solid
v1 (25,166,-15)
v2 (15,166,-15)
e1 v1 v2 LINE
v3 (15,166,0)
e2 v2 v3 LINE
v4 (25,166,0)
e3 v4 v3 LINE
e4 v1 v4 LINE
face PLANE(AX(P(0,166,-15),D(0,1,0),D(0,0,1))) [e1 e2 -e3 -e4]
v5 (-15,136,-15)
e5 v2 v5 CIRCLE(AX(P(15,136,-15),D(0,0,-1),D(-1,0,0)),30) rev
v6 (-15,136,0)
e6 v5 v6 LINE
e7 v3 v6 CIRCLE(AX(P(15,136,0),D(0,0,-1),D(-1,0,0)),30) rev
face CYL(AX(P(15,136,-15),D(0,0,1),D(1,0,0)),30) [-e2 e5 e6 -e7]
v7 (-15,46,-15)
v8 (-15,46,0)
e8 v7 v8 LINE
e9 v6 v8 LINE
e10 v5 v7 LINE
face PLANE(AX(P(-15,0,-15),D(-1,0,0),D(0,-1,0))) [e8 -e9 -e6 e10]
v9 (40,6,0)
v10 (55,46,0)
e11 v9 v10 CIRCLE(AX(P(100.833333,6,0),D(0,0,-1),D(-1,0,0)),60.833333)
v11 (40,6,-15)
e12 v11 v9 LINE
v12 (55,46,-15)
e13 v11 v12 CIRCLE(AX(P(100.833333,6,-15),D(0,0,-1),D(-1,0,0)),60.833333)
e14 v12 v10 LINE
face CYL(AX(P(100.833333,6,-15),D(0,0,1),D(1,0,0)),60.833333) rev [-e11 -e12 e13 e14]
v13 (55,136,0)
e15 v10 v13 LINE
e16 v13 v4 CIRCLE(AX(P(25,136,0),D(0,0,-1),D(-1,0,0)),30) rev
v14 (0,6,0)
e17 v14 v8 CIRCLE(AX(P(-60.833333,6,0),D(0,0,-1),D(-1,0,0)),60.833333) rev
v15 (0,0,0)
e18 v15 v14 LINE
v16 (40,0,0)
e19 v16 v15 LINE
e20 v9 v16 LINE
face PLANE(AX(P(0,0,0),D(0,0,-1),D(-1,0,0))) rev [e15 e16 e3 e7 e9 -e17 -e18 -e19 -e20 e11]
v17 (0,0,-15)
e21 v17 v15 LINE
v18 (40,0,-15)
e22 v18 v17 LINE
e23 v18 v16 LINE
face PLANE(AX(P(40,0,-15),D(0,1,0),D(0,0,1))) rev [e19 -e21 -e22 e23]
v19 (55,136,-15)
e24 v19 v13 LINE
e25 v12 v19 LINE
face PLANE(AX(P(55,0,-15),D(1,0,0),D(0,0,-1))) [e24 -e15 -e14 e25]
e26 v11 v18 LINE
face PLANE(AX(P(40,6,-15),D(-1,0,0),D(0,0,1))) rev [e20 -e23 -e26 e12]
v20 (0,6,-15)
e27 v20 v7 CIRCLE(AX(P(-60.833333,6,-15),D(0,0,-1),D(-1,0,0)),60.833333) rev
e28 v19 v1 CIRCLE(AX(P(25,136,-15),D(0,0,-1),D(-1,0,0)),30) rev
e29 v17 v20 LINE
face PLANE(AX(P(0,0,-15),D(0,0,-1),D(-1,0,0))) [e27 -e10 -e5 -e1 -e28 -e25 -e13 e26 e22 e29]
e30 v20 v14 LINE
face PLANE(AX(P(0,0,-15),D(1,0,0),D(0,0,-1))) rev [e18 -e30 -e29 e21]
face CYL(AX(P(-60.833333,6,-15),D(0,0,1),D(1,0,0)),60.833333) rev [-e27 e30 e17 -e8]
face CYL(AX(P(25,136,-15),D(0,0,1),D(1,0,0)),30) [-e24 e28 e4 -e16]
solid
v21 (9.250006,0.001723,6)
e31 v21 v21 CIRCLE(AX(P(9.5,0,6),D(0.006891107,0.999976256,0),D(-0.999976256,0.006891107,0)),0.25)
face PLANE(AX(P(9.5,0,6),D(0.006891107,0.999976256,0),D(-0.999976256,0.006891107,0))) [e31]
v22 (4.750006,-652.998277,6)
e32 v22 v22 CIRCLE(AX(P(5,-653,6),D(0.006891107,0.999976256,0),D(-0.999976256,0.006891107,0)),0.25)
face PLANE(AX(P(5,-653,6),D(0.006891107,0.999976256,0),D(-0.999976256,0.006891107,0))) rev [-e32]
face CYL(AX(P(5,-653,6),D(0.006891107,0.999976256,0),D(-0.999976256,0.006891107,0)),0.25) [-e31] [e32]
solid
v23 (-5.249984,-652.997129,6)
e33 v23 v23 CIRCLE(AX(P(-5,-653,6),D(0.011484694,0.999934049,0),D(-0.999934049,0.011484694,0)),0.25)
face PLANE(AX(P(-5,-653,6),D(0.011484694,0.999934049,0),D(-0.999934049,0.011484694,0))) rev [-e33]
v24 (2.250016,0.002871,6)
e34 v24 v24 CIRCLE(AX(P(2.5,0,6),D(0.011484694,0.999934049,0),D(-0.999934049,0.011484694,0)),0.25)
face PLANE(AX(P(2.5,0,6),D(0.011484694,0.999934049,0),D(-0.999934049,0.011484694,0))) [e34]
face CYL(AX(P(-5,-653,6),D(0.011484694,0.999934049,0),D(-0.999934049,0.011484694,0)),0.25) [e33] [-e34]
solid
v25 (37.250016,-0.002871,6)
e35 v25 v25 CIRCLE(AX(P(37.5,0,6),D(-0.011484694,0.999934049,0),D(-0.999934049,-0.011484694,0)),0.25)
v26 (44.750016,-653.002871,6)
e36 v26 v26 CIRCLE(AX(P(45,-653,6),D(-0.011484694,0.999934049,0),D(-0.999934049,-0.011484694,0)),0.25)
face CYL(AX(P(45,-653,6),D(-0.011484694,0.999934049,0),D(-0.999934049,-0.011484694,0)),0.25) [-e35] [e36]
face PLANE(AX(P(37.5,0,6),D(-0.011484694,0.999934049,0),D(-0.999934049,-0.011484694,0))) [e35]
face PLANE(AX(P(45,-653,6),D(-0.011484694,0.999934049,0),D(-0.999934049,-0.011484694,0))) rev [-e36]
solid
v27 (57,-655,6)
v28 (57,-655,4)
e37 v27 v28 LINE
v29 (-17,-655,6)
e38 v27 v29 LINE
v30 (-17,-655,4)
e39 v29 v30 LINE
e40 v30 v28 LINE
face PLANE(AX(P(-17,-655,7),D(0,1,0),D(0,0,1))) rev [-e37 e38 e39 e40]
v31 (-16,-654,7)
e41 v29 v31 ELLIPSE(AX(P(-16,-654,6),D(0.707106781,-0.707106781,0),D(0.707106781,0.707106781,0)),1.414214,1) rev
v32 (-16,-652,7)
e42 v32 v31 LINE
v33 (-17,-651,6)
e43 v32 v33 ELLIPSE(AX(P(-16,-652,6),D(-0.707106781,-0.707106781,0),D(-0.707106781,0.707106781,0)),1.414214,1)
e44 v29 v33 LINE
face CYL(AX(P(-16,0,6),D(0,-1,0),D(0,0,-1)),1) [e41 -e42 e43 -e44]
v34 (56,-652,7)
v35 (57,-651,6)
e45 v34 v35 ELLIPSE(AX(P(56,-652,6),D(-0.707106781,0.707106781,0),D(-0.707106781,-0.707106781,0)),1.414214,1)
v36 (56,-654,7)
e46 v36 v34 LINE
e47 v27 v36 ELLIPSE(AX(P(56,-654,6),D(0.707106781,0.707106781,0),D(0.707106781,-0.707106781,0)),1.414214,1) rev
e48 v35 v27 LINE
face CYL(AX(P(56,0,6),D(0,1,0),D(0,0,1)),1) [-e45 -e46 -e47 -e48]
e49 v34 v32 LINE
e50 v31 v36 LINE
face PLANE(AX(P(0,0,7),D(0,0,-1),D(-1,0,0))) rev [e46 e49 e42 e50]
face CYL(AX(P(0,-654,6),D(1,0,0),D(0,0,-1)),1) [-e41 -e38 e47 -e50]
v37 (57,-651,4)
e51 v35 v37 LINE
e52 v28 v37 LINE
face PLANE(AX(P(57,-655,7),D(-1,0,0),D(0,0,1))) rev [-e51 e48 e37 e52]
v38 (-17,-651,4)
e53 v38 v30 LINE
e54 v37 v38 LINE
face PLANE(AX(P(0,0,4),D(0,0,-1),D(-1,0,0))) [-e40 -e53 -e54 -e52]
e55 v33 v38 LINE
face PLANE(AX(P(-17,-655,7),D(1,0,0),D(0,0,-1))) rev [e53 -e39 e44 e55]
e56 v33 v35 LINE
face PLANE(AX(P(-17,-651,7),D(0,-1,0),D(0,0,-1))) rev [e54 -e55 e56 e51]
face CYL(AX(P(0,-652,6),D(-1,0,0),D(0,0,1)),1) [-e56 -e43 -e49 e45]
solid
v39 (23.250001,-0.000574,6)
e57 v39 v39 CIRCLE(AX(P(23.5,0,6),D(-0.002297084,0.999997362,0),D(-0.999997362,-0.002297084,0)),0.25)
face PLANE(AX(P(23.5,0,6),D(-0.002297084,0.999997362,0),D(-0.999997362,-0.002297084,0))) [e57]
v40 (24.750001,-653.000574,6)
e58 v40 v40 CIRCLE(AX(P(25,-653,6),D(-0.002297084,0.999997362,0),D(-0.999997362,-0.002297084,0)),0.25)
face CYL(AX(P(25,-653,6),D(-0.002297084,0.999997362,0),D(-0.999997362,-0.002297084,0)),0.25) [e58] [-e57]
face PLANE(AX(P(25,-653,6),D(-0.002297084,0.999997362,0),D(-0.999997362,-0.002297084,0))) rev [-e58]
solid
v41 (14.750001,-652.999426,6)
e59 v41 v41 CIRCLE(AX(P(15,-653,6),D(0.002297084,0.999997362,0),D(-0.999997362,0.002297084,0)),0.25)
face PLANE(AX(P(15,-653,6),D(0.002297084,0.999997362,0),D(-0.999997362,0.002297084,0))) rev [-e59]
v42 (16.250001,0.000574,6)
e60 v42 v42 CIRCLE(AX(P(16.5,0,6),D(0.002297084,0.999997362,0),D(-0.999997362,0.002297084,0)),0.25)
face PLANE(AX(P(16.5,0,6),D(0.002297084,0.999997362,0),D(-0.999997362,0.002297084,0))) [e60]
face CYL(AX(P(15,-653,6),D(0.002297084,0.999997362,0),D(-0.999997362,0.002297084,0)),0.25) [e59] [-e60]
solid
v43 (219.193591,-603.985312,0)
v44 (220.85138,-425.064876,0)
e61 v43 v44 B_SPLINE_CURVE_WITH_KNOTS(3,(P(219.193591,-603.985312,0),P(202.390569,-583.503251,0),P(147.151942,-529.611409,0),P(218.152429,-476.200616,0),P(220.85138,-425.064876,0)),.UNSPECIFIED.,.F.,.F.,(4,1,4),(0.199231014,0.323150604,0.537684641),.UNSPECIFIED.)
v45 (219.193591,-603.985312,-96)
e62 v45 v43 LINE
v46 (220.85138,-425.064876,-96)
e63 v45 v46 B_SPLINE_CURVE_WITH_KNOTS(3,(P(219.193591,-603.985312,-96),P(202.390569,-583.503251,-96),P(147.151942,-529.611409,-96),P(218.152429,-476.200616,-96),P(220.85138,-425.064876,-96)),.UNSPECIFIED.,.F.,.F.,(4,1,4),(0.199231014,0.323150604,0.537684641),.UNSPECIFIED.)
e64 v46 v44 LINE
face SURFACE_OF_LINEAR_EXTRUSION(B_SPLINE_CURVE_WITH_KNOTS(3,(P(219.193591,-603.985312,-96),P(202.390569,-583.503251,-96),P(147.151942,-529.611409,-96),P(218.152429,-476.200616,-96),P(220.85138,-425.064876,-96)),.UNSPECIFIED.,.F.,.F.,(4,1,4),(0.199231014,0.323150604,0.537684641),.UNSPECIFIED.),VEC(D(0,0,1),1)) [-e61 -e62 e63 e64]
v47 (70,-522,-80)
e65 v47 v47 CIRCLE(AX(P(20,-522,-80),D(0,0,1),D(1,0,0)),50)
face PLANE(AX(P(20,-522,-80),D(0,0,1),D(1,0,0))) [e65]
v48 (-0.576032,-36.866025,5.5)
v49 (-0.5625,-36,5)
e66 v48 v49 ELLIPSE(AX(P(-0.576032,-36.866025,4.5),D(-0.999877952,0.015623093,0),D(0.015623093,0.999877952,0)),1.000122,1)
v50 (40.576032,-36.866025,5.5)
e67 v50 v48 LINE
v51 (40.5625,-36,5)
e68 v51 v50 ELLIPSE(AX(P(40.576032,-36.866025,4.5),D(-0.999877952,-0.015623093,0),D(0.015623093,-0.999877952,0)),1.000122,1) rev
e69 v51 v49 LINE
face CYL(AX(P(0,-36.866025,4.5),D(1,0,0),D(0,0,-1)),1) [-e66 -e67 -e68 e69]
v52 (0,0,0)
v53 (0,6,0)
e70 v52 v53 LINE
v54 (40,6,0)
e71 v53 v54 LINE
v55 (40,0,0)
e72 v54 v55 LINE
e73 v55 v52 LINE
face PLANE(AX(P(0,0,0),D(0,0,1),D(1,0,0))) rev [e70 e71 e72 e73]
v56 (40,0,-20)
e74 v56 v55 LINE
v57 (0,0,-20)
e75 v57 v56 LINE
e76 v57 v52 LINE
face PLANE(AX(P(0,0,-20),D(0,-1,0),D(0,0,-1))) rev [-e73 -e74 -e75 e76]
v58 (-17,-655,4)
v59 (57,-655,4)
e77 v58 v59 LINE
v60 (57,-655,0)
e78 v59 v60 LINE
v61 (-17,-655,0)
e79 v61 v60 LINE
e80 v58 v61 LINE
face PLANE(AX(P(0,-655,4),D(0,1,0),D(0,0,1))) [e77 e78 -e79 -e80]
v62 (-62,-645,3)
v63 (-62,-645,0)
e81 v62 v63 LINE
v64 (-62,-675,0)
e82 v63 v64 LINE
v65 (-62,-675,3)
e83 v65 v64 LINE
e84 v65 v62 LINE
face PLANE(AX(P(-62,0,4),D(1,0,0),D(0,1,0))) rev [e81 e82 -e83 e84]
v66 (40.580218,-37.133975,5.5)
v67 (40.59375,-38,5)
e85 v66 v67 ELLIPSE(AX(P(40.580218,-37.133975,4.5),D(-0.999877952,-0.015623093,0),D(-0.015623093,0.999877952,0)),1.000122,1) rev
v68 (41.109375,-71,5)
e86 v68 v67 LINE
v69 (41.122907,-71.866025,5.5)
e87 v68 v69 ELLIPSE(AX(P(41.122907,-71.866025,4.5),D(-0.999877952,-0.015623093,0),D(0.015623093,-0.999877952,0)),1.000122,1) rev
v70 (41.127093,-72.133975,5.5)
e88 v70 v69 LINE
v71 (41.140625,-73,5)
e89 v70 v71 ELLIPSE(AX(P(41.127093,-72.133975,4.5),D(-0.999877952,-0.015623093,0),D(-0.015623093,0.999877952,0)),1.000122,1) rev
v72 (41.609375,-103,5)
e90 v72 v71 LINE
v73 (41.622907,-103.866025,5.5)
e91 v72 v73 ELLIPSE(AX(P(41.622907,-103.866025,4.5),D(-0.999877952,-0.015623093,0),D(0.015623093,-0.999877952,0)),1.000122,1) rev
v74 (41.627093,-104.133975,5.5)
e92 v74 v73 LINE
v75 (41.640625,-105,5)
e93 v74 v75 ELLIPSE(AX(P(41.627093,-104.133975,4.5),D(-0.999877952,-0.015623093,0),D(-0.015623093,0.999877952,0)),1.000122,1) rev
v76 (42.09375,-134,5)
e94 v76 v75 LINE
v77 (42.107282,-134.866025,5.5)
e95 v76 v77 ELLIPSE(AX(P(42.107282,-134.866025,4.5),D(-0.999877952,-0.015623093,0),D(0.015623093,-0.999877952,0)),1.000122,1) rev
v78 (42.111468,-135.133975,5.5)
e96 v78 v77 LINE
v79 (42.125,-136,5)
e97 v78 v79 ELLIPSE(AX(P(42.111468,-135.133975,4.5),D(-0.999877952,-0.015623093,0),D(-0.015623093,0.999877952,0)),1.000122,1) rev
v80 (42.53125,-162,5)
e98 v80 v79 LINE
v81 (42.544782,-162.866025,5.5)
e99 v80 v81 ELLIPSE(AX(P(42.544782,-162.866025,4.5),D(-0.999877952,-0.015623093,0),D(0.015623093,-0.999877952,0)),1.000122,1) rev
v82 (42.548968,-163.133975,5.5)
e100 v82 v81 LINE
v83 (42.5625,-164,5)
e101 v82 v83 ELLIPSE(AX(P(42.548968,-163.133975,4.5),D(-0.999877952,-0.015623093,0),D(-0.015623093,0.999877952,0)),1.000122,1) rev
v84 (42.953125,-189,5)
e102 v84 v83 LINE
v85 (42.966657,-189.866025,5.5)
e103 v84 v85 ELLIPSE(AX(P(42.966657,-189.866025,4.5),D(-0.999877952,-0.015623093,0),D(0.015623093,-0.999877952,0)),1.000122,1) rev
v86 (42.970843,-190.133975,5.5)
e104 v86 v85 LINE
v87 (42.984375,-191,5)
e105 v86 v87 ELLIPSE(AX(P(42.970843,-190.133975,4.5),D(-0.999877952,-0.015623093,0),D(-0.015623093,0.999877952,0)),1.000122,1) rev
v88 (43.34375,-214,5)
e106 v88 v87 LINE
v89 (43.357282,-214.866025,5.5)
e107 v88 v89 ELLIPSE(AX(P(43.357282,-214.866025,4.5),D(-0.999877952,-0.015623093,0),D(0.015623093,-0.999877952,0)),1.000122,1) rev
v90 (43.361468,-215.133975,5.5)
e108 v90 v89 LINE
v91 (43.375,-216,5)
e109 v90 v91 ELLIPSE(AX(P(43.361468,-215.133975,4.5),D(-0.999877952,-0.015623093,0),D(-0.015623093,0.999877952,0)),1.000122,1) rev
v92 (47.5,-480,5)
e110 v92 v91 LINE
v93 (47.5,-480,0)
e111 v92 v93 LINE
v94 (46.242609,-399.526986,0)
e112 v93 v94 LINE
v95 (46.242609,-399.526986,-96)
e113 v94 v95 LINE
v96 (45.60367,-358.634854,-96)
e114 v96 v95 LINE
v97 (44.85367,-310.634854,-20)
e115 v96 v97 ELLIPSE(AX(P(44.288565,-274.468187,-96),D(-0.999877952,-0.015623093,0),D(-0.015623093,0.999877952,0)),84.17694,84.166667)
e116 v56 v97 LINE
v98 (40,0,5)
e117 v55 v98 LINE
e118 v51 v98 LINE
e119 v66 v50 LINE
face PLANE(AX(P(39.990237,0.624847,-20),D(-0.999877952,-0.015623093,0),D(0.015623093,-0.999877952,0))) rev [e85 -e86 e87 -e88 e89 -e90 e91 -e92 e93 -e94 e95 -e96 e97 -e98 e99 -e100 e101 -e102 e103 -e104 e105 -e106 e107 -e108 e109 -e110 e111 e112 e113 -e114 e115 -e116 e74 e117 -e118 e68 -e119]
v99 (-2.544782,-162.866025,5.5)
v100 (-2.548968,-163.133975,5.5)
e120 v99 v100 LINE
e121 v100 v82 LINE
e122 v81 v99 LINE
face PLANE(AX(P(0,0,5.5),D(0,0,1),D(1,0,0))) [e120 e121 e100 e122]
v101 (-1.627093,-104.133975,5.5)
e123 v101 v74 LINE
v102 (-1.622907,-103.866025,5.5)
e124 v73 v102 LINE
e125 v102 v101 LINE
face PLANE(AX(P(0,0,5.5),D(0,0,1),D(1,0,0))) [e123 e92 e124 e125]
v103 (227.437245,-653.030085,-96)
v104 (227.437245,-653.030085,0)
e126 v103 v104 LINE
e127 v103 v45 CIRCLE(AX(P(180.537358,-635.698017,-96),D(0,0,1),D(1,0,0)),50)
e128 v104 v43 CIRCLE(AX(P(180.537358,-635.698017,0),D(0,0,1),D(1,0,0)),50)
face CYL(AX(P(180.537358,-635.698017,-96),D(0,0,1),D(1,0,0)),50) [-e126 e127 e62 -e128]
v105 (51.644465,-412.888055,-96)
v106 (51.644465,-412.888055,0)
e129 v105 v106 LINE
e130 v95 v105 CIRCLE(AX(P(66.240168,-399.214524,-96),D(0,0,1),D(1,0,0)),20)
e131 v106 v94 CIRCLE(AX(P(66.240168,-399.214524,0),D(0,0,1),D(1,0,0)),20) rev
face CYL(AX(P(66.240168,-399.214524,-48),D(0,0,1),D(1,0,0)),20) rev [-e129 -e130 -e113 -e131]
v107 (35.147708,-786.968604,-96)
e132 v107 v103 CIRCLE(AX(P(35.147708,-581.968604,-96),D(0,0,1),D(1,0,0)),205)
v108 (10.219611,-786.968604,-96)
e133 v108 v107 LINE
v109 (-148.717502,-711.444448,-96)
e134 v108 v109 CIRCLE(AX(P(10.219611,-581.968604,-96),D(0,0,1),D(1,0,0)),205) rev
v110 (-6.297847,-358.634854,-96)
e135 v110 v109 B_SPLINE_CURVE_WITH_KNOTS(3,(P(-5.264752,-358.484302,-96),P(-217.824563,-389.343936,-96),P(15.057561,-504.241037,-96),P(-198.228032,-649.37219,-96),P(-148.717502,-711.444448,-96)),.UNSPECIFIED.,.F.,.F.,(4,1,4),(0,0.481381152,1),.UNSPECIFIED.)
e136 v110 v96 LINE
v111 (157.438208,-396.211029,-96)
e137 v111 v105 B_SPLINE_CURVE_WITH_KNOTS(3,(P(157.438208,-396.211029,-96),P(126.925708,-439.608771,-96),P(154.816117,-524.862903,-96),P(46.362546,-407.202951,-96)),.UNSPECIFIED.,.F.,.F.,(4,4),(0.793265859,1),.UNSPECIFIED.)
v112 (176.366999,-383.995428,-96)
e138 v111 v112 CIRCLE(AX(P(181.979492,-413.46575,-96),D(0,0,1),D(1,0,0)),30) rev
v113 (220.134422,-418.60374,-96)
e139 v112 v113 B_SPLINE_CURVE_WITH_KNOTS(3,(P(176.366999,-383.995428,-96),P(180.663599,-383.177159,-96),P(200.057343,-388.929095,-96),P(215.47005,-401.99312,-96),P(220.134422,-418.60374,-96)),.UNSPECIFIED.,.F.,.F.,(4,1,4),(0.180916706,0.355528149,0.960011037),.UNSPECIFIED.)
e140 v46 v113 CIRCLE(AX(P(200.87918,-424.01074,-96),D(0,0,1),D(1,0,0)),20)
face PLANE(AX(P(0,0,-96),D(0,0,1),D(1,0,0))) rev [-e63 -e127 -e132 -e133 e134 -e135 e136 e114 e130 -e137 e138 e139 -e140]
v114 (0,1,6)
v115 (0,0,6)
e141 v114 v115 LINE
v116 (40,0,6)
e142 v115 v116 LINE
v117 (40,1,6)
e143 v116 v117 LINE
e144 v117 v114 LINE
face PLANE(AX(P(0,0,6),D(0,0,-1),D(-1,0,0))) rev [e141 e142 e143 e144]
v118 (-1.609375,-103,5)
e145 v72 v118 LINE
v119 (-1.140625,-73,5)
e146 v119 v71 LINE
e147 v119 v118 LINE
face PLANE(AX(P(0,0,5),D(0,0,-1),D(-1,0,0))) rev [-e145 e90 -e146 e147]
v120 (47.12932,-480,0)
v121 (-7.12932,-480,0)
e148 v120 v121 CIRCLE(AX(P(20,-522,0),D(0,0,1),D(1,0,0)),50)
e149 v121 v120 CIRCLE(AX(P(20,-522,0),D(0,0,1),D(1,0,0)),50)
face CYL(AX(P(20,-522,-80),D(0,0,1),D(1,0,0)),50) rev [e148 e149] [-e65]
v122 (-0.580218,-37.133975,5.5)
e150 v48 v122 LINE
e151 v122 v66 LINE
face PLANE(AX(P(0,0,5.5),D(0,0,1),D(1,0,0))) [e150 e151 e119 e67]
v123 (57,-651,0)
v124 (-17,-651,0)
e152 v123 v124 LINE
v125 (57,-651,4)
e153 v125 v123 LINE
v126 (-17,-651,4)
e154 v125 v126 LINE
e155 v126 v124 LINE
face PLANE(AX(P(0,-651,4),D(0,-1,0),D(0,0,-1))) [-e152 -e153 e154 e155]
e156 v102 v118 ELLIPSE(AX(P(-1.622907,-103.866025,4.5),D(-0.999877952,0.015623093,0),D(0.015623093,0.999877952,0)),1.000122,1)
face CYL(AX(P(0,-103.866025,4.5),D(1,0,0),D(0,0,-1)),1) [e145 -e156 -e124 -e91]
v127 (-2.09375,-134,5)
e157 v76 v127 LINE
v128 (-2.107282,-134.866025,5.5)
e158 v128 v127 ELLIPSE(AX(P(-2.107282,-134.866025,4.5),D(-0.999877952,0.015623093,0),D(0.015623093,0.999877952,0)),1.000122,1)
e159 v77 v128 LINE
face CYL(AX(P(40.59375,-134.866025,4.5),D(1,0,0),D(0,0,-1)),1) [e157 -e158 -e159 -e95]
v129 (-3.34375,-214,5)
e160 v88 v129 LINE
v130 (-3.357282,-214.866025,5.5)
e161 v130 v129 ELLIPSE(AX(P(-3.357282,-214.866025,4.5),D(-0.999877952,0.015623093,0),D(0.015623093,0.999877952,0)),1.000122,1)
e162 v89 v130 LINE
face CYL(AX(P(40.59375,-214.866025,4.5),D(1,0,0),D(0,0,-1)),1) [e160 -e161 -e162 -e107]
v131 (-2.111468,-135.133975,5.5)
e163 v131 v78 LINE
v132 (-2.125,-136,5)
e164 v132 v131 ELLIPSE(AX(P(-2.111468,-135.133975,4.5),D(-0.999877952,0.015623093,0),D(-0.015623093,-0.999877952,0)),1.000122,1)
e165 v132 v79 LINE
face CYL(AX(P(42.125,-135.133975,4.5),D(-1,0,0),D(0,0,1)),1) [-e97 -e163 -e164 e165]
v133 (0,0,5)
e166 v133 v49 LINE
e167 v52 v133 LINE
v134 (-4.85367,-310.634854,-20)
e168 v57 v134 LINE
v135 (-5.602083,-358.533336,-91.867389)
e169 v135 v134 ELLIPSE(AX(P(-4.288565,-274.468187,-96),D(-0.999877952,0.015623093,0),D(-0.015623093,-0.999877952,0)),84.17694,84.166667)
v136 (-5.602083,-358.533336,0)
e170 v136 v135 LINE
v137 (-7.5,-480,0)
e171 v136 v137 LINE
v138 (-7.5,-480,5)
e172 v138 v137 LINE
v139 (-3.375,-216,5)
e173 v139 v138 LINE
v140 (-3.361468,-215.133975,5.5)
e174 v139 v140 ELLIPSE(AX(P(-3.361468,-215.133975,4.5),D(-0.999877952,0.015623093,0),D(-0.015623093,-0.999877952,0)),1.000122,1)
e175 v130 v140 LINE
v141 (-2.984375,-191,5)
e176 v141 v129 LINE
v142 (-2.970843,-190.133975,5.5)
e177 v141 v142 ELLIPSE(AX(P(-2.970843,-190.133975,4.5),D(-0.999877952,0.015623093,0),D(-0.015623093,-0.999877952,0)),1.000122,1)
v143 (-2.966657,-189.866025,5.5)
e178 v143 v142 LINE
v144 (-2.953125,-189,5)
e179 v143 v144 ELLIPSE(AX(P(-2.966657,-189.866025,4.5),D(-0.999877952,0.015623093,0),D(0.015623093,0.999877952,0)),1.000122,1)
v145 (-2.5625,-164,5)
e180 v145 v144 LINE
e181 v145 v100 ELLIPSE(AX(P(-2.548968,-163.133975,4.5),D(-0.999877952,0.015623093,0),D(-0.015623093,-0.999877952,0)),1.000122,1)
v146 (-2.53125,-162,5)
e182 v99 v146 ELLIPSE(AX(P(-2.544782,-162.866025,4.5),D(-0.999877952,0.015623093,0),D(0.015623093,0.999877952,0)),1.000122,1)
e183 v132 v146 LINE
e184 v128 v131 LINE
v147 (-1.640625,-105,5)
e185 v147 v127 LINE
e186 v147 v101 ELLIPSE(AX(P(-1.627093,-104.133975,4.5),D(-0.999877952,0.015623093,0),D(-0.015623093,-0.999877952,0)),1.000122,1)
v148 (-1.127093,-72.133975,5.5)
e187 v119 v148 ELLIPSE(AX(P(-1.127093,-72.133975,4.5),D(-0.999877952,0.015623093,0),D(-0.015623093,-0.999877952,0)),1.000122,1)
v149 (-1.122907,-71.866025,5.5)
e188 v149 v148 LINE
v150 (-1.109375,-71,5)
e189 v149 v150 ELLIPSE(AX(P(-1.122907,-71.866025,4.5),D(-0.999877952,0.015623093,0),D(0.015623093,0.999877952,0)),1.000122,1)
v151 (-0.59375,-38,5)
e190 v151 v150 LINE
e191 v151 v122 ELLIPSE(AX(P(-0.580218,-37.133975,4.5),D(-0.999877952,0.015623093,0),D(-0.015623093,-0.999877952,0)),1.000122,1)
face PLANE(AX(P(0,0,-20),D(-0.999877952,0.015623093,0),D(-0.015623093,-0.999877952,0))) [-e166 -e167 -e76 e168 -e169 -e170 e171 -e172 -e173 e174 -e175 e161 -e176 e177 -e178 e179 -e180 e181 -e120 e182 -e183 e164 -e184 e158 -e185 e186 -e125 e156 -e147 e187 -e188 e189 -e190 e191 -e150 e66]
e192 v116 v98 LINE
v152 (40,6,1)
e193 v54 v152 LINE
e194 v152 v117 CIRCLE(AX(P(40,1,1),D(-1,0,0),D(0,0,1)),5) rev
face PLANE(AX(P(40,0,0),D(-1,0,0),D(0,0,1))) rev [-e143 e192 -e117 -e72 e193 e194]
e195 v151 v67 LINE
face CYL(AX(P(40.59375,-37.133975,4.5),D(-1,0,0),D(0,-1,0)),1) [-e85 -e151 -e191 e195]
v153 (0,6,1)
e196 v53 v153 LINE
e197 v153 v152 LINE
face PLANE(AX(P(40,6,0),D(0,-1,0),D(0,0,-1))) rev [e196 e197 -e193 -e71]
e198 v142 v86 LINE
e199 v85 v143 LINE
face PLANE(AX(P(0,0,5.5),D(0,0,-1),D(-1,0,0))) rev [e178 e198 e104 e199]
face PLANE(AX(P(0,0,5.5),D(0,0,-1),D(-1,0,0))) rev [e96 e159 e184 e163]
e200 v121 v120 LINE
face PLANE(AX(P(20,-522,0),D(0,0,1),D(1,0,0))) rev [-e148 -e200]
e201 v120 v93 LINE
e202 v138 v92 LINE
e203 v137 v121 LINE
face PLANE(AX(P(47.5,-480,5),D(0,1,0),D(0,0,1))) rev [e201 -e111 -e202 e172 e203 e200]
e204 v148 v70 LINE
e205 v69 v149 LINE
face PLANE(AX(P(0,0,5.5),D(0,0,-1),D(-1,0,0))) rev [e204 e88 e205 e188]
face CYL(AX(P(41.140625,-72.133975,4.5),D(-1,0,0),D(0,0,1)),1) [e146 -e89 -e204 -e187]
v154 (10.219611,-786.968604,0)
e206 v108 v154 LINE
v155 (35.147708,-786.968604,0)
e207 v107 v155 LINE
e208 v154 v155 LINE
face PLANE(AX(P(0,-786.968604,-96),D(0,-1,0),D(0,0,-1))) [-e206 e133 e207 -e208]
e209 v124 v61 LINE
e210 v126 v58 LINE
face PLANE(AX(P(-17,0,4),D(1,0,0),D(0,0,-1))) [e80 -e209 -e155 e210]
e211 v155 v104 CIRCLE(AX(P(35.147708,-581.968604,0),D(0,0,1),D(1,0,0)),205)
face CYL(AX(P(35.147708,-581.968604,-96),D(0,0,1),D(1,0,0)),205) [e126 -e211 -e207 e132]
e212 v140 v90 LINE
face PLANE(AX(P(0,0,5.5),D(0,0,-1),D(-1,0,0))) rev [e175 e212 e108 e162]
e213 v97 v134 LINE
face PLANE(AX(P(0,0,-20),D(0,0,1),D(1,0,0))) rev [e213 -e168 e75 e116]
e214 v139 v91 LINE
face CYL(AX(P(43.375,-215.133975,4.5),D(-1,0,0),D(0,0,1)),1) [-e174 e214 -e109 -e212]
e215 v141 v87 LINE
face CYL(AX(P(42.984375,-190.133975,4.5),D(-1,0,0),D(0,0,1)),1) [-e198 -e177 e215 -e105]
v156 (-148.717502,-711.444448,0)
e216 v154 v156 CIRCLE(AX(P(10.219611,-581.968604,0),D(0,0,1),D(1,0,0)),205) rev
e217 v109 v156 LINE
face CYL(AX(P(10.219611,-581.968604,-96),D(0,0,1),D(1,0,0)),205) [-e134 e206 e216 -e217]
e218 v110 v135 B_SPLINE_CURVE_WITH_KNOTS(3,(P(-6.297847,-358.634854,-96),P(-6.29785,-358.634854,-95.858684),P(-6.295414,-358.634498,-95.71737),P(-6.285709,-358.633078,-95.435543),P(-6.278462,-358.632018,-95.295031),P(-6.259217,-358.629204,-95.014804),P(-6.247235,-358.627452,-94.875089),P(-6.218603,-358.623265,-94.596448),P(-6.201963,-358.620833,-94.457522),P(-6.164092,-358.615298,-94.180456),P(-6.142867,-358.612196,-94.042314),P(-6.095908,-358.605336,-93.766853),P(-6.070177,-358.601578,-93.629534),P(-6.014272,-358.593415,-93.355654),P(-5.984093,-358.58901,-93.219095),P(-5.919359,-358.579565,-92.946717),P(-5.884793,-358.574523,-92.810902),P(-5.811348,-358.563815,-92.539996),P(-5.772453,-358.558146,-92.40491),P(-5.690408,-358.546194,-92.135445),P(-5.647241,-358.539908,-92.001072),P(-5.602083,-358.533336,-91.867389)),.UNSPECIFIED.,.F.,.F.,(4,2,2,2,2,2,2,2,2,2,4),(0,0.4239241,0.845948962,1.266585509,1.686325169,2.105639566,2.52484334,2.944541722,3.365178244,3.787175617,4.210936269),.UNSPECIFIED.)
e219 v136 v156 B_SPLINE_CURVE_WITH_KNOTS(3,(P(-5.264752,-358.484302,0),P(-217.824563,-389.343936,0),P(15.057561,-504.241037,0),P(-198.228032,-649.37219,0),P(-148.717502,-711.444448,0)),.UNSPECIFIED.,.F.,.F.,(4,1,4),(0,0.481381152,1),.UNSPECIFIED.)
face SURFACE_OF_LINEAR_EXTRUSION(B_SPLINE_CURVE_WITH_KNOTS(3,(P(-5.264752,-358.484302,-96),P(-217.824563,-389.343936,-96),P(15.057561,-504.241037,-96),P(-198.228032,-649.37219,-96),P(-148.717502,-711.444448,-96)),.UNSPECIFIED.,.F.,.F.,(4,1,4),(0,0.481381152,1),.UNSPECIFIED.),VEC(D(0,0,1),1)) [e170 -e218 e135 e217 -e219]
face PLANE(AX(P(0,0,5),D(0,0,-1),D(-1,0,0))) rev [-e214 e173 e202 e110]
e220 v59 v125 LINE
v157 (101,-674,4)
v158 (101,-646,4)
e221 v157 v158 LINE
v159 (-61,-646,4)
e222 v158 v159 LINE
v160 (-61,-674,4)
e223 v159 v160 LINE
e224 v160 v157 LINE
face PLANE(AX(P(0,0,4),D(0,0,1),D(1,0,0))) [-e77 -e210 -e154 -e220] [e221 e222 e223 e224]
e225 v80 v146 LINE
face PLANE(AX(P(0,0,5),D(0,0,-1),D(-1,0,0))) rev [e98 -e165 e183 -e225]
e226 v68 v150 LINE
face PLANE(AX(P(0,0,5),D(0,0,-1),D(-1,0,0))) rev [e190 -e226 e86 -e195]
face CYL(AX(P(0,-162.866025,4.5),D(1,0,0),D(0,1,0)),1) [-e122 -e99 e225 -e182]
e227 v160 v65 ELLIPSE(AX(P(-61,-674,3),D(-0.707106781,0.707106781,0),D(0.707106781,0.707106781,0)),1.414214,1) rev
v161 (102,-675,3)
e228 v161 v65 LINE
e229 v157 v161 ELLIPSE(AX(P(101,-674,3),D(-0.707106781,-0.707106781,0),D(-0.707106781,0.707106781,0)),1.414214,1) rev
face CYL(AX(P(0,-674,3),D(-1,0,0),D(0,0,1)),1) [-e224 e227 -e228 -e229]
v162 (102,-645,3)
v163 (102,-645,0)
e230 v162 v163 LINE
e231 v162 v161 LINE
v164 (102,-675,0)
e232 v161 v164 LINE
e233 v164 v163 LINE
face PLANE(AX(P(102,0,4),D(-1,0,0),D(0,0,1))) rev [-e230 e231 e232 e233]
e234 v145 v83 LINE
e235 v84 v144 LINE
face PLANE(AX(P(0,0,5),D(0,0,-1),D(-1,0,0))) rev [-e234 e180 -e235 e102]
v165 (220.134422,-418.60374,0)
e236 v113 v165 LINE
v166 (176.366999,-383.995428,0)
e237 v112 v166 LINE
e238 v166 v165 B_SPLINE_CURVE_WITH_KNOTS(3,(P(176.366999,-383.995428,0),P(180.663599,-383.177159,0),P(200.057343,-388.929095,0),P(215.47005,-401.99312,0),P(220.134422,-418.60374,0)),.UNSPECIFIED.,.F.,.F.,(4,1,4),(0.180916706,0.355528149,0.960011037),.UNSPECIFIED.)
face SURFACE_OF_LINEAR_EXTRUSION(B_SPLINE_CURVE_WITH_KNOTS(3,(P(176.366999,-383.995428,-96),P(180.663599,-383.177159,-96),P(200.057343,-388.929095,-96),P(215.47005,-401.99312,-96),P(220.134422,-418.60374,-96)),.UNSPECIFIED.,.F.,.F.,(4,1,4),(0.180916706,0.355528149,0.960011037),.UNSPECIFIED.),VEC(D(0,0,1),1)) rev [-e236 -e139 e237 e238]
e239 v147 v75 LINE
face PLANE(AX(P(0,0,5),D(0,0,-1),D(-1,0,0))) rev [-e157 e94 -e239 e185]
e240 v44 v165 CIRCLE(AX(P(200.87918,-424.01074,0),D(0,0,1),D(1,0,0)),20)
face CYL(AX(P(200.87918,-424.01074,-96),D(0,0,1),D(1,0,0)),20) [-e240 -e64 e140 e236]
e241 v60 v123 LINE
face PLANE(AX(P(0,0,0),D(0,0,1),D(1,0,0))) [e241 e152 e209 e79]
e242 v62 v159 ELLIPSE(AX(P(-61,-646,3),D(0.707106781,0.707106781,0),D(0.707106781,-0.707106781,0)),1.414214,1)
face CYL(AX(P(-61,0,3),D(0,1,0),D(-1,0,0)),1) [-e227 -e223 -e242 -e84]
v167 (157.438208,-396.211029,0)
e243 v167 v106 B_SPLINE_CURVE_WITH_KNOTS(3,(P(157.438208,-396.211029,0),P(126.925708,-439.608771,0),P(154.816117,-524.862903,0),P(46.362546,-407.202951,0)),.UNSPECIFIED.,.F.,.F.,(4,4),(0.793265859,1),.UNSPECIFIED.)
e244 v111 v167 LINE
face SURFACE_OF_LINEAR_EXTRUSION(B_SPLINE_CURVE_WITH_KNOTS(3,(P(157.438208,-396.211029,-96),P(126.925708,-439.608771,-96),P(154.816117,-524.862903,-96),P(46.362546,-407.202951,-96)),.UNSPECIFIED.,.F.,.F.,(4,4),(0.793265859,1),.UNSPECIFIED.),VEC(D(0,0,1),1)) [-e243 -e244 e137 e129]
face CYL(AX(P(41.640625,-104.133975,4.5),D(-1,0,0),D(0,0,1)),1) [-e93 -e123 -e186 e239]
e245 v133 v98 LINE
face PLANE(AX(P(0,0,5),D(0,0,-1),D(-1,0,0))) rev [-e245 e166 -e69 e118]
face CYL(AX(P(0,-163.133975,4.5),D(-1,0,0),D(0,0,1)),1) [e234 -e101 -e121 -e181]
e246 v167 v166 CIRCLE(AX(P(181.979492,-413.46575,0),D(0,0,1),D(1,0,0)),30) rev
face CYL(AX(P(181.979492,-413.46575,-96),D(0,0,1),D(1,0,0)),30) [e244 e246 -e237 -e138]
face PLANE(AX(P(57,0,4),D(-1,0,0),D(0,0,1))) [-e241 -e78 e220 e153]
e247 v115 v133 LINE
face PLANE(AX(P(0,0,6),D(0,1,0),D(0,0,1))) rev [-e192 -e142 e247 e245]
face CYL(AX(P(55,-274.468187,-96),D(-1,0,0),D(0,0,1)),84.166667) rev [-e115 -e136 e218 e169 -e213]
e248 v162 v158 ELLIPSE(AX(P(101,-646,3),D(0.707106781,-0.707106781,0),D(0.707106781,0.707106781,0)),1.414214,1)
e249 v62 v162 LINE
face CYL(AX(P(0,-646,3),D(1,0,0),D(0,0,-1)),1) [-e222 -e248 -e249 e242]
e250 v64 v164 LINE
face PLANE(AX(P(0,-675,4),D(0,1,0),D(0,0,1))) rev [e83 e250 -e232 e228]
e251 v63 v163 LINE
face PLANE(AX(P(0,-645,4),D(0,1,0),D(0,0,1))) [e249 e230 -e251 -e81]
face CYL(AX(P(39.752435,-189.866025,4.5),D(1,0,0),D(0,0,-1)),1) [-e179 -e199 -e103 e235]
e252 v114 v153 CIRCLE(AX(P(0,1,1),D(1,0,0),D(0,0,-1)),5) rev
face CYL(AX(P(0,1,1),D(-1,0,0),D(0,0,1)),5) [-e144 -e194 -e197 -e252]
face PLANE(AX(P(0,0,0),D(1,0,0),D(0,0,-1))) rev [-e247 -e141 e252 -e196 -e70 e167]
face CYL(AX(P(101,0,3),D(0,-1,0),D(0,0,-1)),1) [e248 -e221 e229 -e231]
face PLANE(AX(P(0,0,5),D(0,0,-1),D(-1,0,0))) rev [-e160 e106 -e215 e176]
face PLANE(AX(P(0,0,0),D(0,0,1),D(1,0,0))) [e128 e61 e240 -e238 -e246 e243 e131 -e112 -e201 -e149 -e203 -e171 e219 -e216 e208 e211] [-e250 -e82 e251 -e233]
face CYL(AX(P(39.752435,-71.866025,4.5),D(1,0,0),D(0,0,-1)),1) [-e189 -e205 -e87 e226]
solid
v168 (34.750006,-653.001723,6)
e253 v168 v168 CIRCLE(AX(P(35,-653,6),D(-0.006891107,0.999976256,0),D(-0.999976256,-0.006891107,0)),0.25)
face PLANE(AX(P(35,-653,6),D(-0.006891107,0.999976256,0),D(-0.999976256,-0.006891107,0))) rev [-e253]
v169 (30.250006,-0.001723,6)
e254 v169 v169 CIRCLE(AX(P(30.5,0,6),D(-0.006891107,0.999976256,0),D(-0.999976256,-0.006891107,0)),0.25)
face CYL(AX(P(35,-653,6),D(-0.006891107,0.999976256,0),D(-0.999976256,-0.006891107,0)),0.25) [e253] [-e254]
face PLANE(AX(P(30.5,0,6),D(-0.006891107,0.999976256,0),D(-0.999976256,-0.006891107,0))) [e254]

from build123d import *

# Parameters (mm, degrees)
BOSS_EXTRUDE1_DEPTH  = 20
BOSS_EXTRUDE2_DEPTH  = 96
FILLET3_R            = 20
BOSS_EXTRUDE3_DEPTH  = 5
BOSS_EXTRUDE4_DEPTH  = 96
CHAMFER1_SIZE        = 48
CUT_EXTRUDE1_DEPTH   = 55
SKETCH28_R           = 50
CUT_EXTRUDE14_DEPTH  = 80
BOSS_EXTRUDE18_DEPTH = 0.5
FILLET31_R           = 1
SKETCH32_W           = 40
SKETCH32_H           = 6
BOSS_EXTRUDE19_DEPTH = 1
SKETCH33_W           = 40
SKETCH33_H           = 6
BOSS_EXTRUDE20_DEPTH = 5
FILLET32_R           = 5
BOSS_EXTRUDE21_DEPTH = 4
SKETCH35_W           = 74
SKETCH35_H           = 4
BOSS_EXTRUDE22_DEPTH = 3
FILLET33_R           = 1
FILLET34_R           = 1
BOSS_EXTRUDE23_DEPTH = 15
SWEEP9_PROFILE_R     = 0.25
SWEEP14_PROFILE_R    = 0.25
SWEEP15_PROFILE_R    = 0.25
SWEEP16_PROFILE_R    = 0.25
SWEEP17_PROFILE_R    = 0.25
SWEEP18_PROFILE_R    = 0.25


with BuildPart() as part:
    # Sketch1 → Boss-Extrude1 (new body)
    with BuildSketch(Plane.XY):
        Polygon((40, 0), (0, 0), (-7.5, -480), (0, -480), (20, -480), (40, -480), (47.5, -480), align=None)
    extrude(amount=-BOSS_EXTRUDE1_DEPTH)

    # Sketch2 → Boss-Extrude2 (add)
    with BuildSketch(Plane.XY):
        with BuildLine():
            Line((10.219610861, -786.968604214), (35.14770821, -786.968604214))
            ThreePointArc((35.14770821, -786.968604214), (152.317235778, -750.183650537), (227.437244868, -653.030085282))
            ThreePointArc((227.437244868, -653.030085282), (229.845672292, -627.410065854), (219.193591135, -603.98531217))
            add(Edge.make_bspline(
                [(219.193591135, -603.98531217), (202.390568913, -583.503251259), (147.151942297, -529.611408553), (218.152428529, -476.200616028), (220.851380358, -425.0648756)],
                knots=[0.199231014, 0.199231014, 0.199231014, 0.199231014, 0.323150604, 0.537684641, 0.537684641, 0.537684641, 0.537684641], degree=3))
            ThreePointArc((220.851380358, -425.0648756), (220.757173483, -421.804982868), (220.134421907, -418.603739978))
            add(Edge.make_bspline(
                [(176.366999248, -383.995427543), (180.66359913, -383.177159069), (200.057343412, -388.929095367), (215.470049543, -401.99312039), (220.134421907, -418.603739978)],
                knots=[0.180916706, 0.180916706, 0.180916706, 0.180916706, 0.355528149, 0.960011037, 0.960011037, 0.960011037, 0.960011037], degree=3))
            ThreePointArc((176.366999248, -383.995427543), (165.712415207, -388.258961345), (157.438208459, -396.211029268))
            add(Edge.make_bspline(
                [(157.438208459, -396.211029268), (126.925707927, -439.608771107), (154.816116558, -524.862903433), (46.362546103, -407.202950609)],
                knots=[0.793265859, 0.793265859, 0.793265859, 0.793265859, 1, 1, 1, 1], degree=3))
            Line((46.362546103, -407.202950609), (45.60131722, -358.484302107))
            Line((45.60131722, -358.484302107), (-5.264752066, -358.484302107))
            add(Edge.make_bspline(
                [(-5.264752066, -358.484302107), (-217.82456269, -389.343935587), (15.057561493, -504.241037009), (-198.228031957, -649.372190009), (-148.717501724, -711.44444846)],
                knots=[0, 0, 0, 0, 0.481381152, 1, 1, 1, 1], degree=3))
            ThreePointArc((-148.717501724, -711.44444846), (-77.764626164, -767.127384819), (10.219610861, -786.968604214))
        make_face()
    extrude(amount=-BOSS_EXTRUDE2_DEPTH)

    # Fillet3
    fillet3_edges = [part.edges().sort_by_distance(p)[0] for p in [
        (46.362546103, -407.202950609, -48),
    ]]
    fillet(fillet3_edges, radius=FILLET3_R)

    # Sketch4 → Boss-Extrude3 (add)
    with BuildSketch(Plane.XY):
        Polygon((-7.5, -480), (0, 0), (40, 0), (47.5, -480), align=None)
    extrude(amount=BOSS_EXTRUDE3_DEPTH)

    # Sketch5 → Boss-Extrude4 (add)
    with BuildSketch(Plane.XY):
        Polygon((45.60131722, -358.484302107), (-5.264752066, -358.484302107), (-5.602083381, -358.533336367), (-4.853669592, -310.634853862), (44.853669592, -310.634853862), align=None)
    extrude(amount=-BOSS_EXTRUDE4_DEPTH)

    # Chamfer1
    # the kernel refuses this chamfer: 48 mm, written as the material it takes off along each edge
    with BuildSketch(Plane(origin=(-128.294453014, -310.634853862, -96), x_dir=(0, -0.9996219169112968, -0.02749587661058648), z_dir=(1, 0, 0))) as chamfer1_piece_1:
        Polygon((CHAMFER1_SIZE * 0.999621916911, -CHAMFER1_SIZE * 0.0274958766106), (-CHAMFER1_SIZE * 0.0274958766106, -CHAMFER1_SIZE * 0.999621916911), (0, 0), align=None)
    extrude(amount=296.588906028, mode=Mode.SUBTRACT)

    # Sketch7 → Cut-Extrude1 (cut, symmetric)
    with BuildSketch(Plane(origin=(0, 0, 0), x_dir=(0, 0, -1), z_dir=(1, 0, 0))):
        with BuildLine():
            ThreePointArc((96, -358.634853862), (51.055589892, -345.630169867), (20, -310.634853862))
            Line((20, -310.634853862), (96, -310.634853862))
            Line((96, -310.634853862), (96, -358.634853862))
        make_face()
    extrude(amount=CUT_EXTRUDE1_DEPTH, both=True, mode=Mode.SUBTRACT)

    # Sketch28 → Cut-Extrude14 (cut)
    with BuildSketch(Plane.XY):
        with Locations((20, -522)):
            Circle(SKETCH28_R)
    extrude(amount=-CUT_EXTRUDE14_DEPTH, mode=Mode.SUBTRACT)

    # Sketch30 → Boss-Extrude18 (add)
    with BuildSketch(Plane.XY.offset(5)):
        Polygon((0, -162), (-2.53125, -162), (-2.5625, -164), (0, -164), (40.59375, -164), (42.5625, -164), (42.53125, -162), (40.59375, -162), align=None)
        Polygon((39.752435227, -36), (40.5625, -36), (40.59375, -38), (39.752435227, -38), (0, -38), (-0.59375, -38), (-0.5625, -36), (0, -36), align=None)
        Polygon((0, -71), (-1.109375, -71), (-1.140625, -73), (0, -73), (39.752435227, -73), (41.140625, -73), (41.109375, -71), (39.752435227, -71), align=None)
        Polygon((39.752435227, -103), (41.609375, -103), (41.640625, -105), (39.752435227, -105), (0, -105), (-1.640625, -105), (-1.609375, -103), (0, -103), align=None)
        Polygon((0, -134), (-2.09375, -134), (-2.125, -136), (0, -136), (40.59375, -136), (42.125, -136), (42.09375, -134), (40.59375, -134), align=None)
        Polygon((0, -189), (-2.953125, -189), (-2.984375, -191), (0, -191), (39.752435227, -191), (42.984375, -191), (42.953125, -189), (39.752435227, -189), align=None)
        Polygon((0, -214), (-3.34375, -214), (-3.375, -216), (0, -216), (40.59375, -216), (43.375, -216), (43.34375, -214), (40.59375, -214), align=None)
    extrude(amount=BOSS_EXTRUDE18_DEPTH)

    # Fillet31
    # the kernel refuses this fillet: 1 mm, written as the material it takes off along each edge
    with BuildSketch(Plane(origin=(45.540063509, -216, 5.5), x_dir=(0, 0, -1), z_dir=(-1, 0, 0))) as fillet31_piece_1:
        with BuildLine():
            CenterArc((1, -0.866025404), FILLET31_R, 120, 60)
            Line((0, -0.866025404), (-0.02, -0.866025404))
            Line((-0.02, -0.866025404), (-0.02, 0))
            Line((-0.02, 0), (0, 0.02))
            ThreePointArc((0, 0.02), (0.25, 0.02), (0.49, 0.017320508))
            Line((0.49, 0.017320508), (0.5, 0))
        make_face()
    extrude(amount=51.080127019, mode=Mode.SUBTRACT)
    with BuildSketch(Plane(origin=(-5.508813509, -214, 5.5), x_dir=(0, 0, -1), z_dir=(1, 0, 0))) as fillet31_piece_2:
        with BuildLine():
            CenterArc((1, -0.866025404), FILLET31_R, 120, 60)
            Line((0, -0.866025404), (-0.02, -0.866025404))
            Line((-0.02, -0.866025404), (-0.02, 0))
            Line((-0.02, 0), (0, 0.02))
            ThreePointArc((0, 0.02), (0.25, 0.02), (0.49, 0.017320508))
            Line((0.49, 0.017320508), (0.5, 0))
        make_face()
    extrude(amount=51.017627019, mode=Mode.SUBTRACT)
    with BuildSketch(Plane(origin=(45.149438509, -191, 5.5), x_dir=(0, 0, -1), z_dir=(-1, 0, 0))) as fillet31_piece_3:
        with BuildLine():
            CenterArc((1, -0.866025404), FILLET31_R, 120, 60)
            Line((0, -0.866025404), (-0.02, -0.866025404))
            Line((-0.02, -0.866025404), (-0.02, 0))
            Line((-0.02, 0), (0, 0.02))
            ThreePointArc((0, 0.02), (0.25, 0.02), (0.49, 0.017320508))
            Line((0.49, 0.017320508), (0.5, 0))
        make_face()
    extrude(amount=50.298877019, mode=Mode.SUBTRACT)
    with BuildSketch(Plane(origin=(-5.118188509, -189, 5.5), x_dir=(0, 0, -1), z_dir=(1, 0, 0))) as fillet31_piece_4:
        with BuildLine():
            CenterArc((1, -0.866025404), FILLET31_R, 120, 60)
            Line((0, -0.866025404), (-0.02, -0.866025404))
            Line((-0.02, -0.866025404), (-0.02, 0))
            Line((-0.02, 0), (0, 0.02))
            ThreePointArc((0, 0.02), (0.25, 0.02), (0.49, 0.017320508))
            Line((0.49, 0.017320508), (0.5, 0))
        make_face()
    extrude(amount=50.236377019, mode=Mode.SUBTRACT)
    with BuildSketch(Plane(origin=(44.727563509, -164, 5.5), x_dir=(0, 0, -1), z_dir=(-1, 0, 0))) as fillet31_piece_5:
        with BuildLine():
            CenterArc((1, -0.866025404), FILLET31_R, 120, 60)
            Line((0, -0.866025404), (-0.02, -0.866025404))
            Line((-0.02, -0.866025404), (-0.02, 0))
            Line((-0.02, 0), (0, 0.02))
            ThreePointArc((0, 0.02), (0.25, 0.02), (0.49, 0.017320508))
            Line((0.49, 0.017320508), (0.5, 0))
        make_face()
    extrude(amount=49.455127019, mode=Mode.SUBTRACT)
    with BuildSketch(Plane(origin=(-4.696313509, -162, 5.5), x_dir=(0, 0, -1), z_dir=(1, 0, 0))) as fillet31_piece_6:
        with BuildLine():
            CenterArc((1, -0.866025404), FILLET31_R, 120, 60)
            Line((0, -0.866025404), (-0.02, -0.866025404))
            Line((-0.02, -0.866025404), (-0.02, 0))
            Line((-0.02, 0), (0, 0.02))
            ThreePointArc((0, 0.02), (0.25, 0.02), (0.49, 0.017320508))
            Line((0.49, 0.017320508), (0.5, 0))
        make_face()
    extrude(amount=49.392627019, mode=Mode.SUBTRACT)
    with BuildSketch(Plane(origin=(44.290063509, -136, 5.5), x_dir=(0, 0, -1), z_dir=(-1, 0, 0))) as fillet31_piece_7:
        with BuildLine():
            CenterArc((1, -0.866025404), FILLET31_R, 120, 60)
            Line((0, -0.866025404), (-0.02, -0.866025404))
            Line((-0.02, -0.866025404), (-0.02, 0))
            Line((-0.02, 0), (0, 0.02))
            ThreePointArc((0, 0.02), (0.25, 0.02), (0.49, 0.017320508))
            Line((0.49, 0.017320508), (0.5, 0))
        make_face()
    extrude(amount=48.580127019, mode=Mode.SUBTRACT)
    with BuildSketch(Plane(origin=(-4.258813509, -134, 5.5), x_dir=(0, 0, -1), z_dir=(1, 0, 0))) as fillet31_piece_8:
        with BuildLine():
            CenterArc((1, -0.866025404), FILLET31_R, 120, 60)
            Line((0, -0.866025404), (-0.02, -0.866025404))
            Line((-0.02, -0.866025404), (-0.02, 0))
            Line((-0.02, 0), (0, 0.02))
            ThreePointArc((0, 0.02), (0.25, 0.02), (0.49, 0.017320508))
            Line((0.49, 0.017320508), (0.5, 0))
        make_face()
    extrude(amount=48.517627019, mode=Mode.SUBTRACT)
    with BuildSketch(Plane(origin=(43.805688509, -105, 5.5), x_dir=(0, 0, -1), z_dir=(-1, 0, 0))) as fillet31_piece_9:
        with BuildLine():
            CenterArc((1, -0.866025404), FILLET31_R, 120, 60)
            Line((0, -0.866025404), (-0.02, -0.866025404))
            Line((-0.02, -0.866025404), (-0.02, 0))
            Line((-0.02, 0), (0, 0.02))
            ThreePointArc((0, 0.02), (0.25, 0.02), (0.49, 0.017320508))
            Line((0.49, 0.017320508), (0.5, 0))
        make_face()
    extrude(amount=47.611377019, mode=Mode.SUBTRACT)
    with BuildSketch(Plane(origin=(-3.774438509, -103, 5.5), x_dir=(0, 0, -1), z_dir=(1, 0, 0))) as fillet31_piece_10:
        with BuildLine():
            CenterArc((1, -0.866025404), FILLET31_R, 120, 60)
            Line((0, -0.866025404), (-0.02, -0.866025404))
            Line((-0.02, -0.866025404), (-0.02, 0))
            Line((-0.02, 0), (0, 0.02))
            ThreePointArc((0, 0.02), (0.25, 0.02), (0.49, 0.017320508))
            Line((0.49, 0.017320508), (0.5, 0))
        make_face()
    extrude(amount=47.548877019, mode=Mode.SUBTRACT)
    with BuildSketch(Plane(origin=(43.305688509, -73, 5.5), x_dir=(0, 0, -1), z_dir=(-1, 0, 0))) as fillet31_piece_11:
        with BuildLine():
            CenterArc((1, -0.866025404), FILLET31_R, 120, 60)
            Line((0, -0.866025404), (-0.02, -0.866025404))
            Line((-0.02, -0.866025404), (-0.02, 0))
            Line((-0.02, 0), (0, 0.02))
            ThreePointArc((0, 0.02), (0.25, 0.02), (0.49, 0.017320508))
            Line((0.49, 0.017320508), (0.5, 0))
        make_face()
    extrude(amount=46.611377019, mode=Mode.SUBTRACT)
    with BuildSketch(Plane(origin=(-3.274438509, -71, 5.5), x_dir=(0, 0, -1), z_dir=(1, 0, 0))) as fillet31_piece_12:
        with BuildLine():
            CenterArc((1, -0.866025404), FILLET31_R, 120, 60)
            Line((0, -0.866025404), (-0.02, -0.866025404))
            Line((-0.02, -0.866025404), (-0.02, 0))
            Line((-0.02, 0), (0, 0.02))
            ThreePointArc((0, 0.02), (0.25, 0.02), (0.49, 0.017320508))
            Line((0.49, 0.017320508), (0.5, 0))
        make_face()
    extrude(amount=46.548877019, mode=Mode.SUBTRACT)
    with BuildSketch(Plane(origin=(42.758813509, -38, 5.5), x_dir=(0, 0, -1), z_dir=(-1, 0, 0))) as fillet31_piece_13:
        with BuildLine():
            CenterArc((1, -0.866025404), FILLET31_R, 120, 60)
            Line((0, -0.866025404), (-0.02, -0.866025404))
            Line((-0.02, -0.866025404), (-0.02, 0))
            Line((-0.02, 0), (0, 0.02))
            ThreePointArc((0, 0.02), (0.25, 0.02), (0.49, 0.017320508))
            Line((0.49, 0.017320508), (0.5, 0))
        make_face()
    extrude(amount=45.517627019, mode=Mode.SUBTRACT)
    with BuildSketch(Plane(origin=(-2.727563509, -36, 5.5), x_dir=(0, 0, -1), z_dir=(1, 0, 0))) as fillet31_piece_14:
        with BuildLine():
            CenterArc((1, -0.866025404), FILLET31_R, 120, 60)
            Line((0, -0.866025404), (-0.02, -0.866025404))
            Line((-0.02, -0.866025404), (-0.02, 0))
            Line((-0.02, 0), (0, 0.02))
            ThreePointArc((0, 0.02), (0.25, 0.02), (0.49, 0.017320508))
            Line((0.49, 0.017320508), (0.5, 0))
        make_face()
    extrude(amount=45.455127019, mode=Mode.SUBTRACT)



with BuildPart() as body_2:
    # Sketch32 → Boss-Extrude19 (new body)
    with BuildSketch(Plane.XY.offset(5)):
        with Locations((20, 3)):
            Rectangle(SKETCH32_W, SKETCH32_H)
    extrude(amount=BOSS_EXTRUDE19_DEPTH)


with BuildPart() as part_1:
    add(part.part)

    add(body_2.part)  # Boss-Extrude20 merges body 2
    # Sketch33 → Boss-Extrude20 (add)
    with BuildSketch(Plane(origin=(0, 0, 5), x_dir=(-1, 0, 0), z_dir=(0, 0, -1))):
        with Locations((-20, 3)):
            Rectangle(SKETCH33_W, SKETCH33_H)
    extrude(amount=BOSS_EXTRUDE20_DEPTH)

    # Fillet32
    fillet32_edges = [part_1.edges().sort_by_distance(p)[0] for p in [
        (20, 6, 6),
    ]]
    fillet(fillet32_edges, radius=FILLET32_R)

    # Sketch34 → Boss-Extrude21 (add)
    with BuildSketch(Plane.XY):
        Polygon((102, -645), (20, -645), (-17, -645), (-62, -645), (-62, -675), (102, -675), align=None)
        Polygon((-17, -651), (20, -651), (57, -651), (57, -655), (-17, -655), align=None, mode=Mode.SUBTRACT)
    extrude(amount=BOSS_EXTRUDE21_DEPTH)

    # Fillet33
    fillet33_edges = [part_1.edges().sort_by_distance(p)[0] for p in [
        (20, -645, 4),
        (20, -675, 4),
        (102, -660, 4),
        (-62, -660, 4),
    ]]
    fillet(fillet33_edges, radius=FILLET33_R)


with BuildPart() as body_2_2:
    # Sketch35 → Boss-Extrude22 (new body)
    with BuildSketch(Plane.XY.offset(4)):
        with Locations((20, -653)):
            Rectangle(SKETCH35_W, SKETCH35_H)
    extrude(amount=BOSS_EXTRUDE22_DEPTH)

    # Fillet34
    fillet34_edges = [body_2_2.edges().sort_by_distance(p)[0] for p in [
        (57, -653, 7),
        (20, -651, 7),
        (-17, -653, 7),
        (20, -655, 7),
    ]]
    fillet(fillet34_edges, radius=FILLET34_R)


with BuildPart() as body_3:
    # Sketch44 → Boss-Extrude23 (new body)
    with BuildSketch(Plane(origin=(0, 0, 0), x_dir=(-1, 0, 0), z_dir=(0, 0, -1))):
        with BuildLine():
            Line((-40, 0), (0, 0))
            Line((0, 0), (0, 6))
            ThreePointArc((0, 6), (3.873308365, 27.360009363), (15, 46))
            Line((15, 46), (15, 136))
            ThreePointArc((15, 136), (6.213203436, 157.213203436), (-15, 166))
            Line((-15, 166), (-25, 166))
            ThreePointArc((-25, 166), (-46.213203436, 157.213203436), (-55, 136))
            Line((-55, 136), (-55, 46))
            ThreePointArc((-55, 46), (-43.873308365, 27.360009363), (-40, 6))
            Line((-40, 6), (-40, 0))
        make_face()
    extrude(amount=BOSS_EXTRUDE23_DEPTH)


with BuildPart() as body_4:
    # Sweep9: sweep along a path in Sketch46
    with BuildLine(Plane(origin=(0, 0, 6), x_dir=(-1, 0, 0), z_dir=(0, 0, -1))) as sweep9_path:
        Line((5, -653), (-2.5, 0))
    # Sweep9 profile (on start of the path) → Sweep9 (sweep)
    with BuildSketch(Plane(origin=(-5, -653, 6), x_dir=(0.9999340487238518, -0.011484694280901693, 0), z_dir=(0.011484694280901693, 0.9999340487238518, 0))):
        Circle(SWEEP9_PROFILE_R)
    sweep(path=sweep9_path.line)


with BuildPart() as body_5:
    # Sweep14: sweep along a path in Sketch110
    with BuildLine(Plane(origin=(0, 0, 6), x_dir=(-1, 0, 0), z_dir=(0, 0, -1))) as sweep14_path:
        Line((-5, -653), (-9.5, 0))
    # Sweep14 profile (on start of the path) → Sweep14 (sweep)
    with BuildSketch(Plane(origin=(5, -653, 6), x_dir=(0.9999762560373022, -0.006891107430578526, 0), z_dir=(0.006891107430578526, 0.9999762560373022, 0))):
        Circle(SWEEP14_PROFILE_R)
    sweep(path=sweep14_path.line)


with BuildPart() as body_6:
    # Sweep15: sweep along a path in Sketch125
    with BuildLine(Plane(origin=(0, 0, 6), x_dir=(-1, 0, 0), z_dir=(0, 0, -1))) as sweep15_path:
        Line((-15, -653), (-16.5, 0))
    # Sweep15 profile (on start of the path) → Sweep15 (sweep)
    with BuildSketch(Plane(origin=(15, -653, 6), x_dir=(0.9999973616983979, -0.0022970842918032365, 0), z_dir=(0.0022970842918032365, 0.9999973616983979, 0))):
        Circle(SWEEP15_PROFILE_R)
    sweep(path=sweep15_path.line)


with BuildPart() as body_7:
    # Sweep16: sweep along a path in Sketch132
    with BuildLine(Plane(origin=(0, 0, 6), x_dir=(-1, 0, 0), z_dir=(0, 0, -1))) as sweep16_path:
        Line((-25, -653), (-23.5, 0))
    # Sweep16 profile (on start of the path) → Sweep16 (sweep)
    with BuildSketch(Plane(origin=(25, -653, 6), x_dir=(0.9999973616983979, 0.002297084291803495, 0), z_dir=(-0.002297084291803495, 0.9999973616983979, 0))):
        Circle(SWEEP16_PROFILE_R)
    sweep(path=sweep16_path.line)


with BuildPart() as body_8:
    # Sweep17: sweep along a path in Sketch139
    with BuildLine(Plane(origin=(0, 0, 6), x_dir=(-1, 0, 0), z_dir=(0, 0, -1))) as sweep17_path:
        Line((-35, -653), (-30.5, 0))
    # Sweep17 profile (on start of the path) → Sweep17 (sweep)
    with BuildSketch(Plane(origin=(35, -653, 6), x_dir=(0.9999762560373022, 0.006891107430578783, 0), z_dir=(-0.006891107430578783, 0.9999762560373022, 0))):
        Circle(SWEEP17_PROFILE_R)
    sweep(path=sweep17_path.line)


with BuildPart() as body_9:
    # Sweep18: sweep along a path in Sketch146
    with BuildLine(Plane(origin=(0, 0, 6), x_dir=(-1, 0, 0), z_dir=(0, 0, -1))) as sweep18_path:
        Line((-45, -653), (-37.5, 0))
    # Sweep18 profile (on start of the path) → Sweep18 (sweep)
    with BuildSketch(Plane(origin=(45, -653, 6), x_dir=(0.9999340487238518, 0.011484694280901951, 0), z_dir=(-0.011484694280901951, 0.9999340487238518, 0))):
        Circle(SWEEP18_PROFILE_R)
    sweep(path=sweep18_path.line)


solid = Compound([part_1.part, body_2_2.part, body_3.part, body_4.part, body_5.part, body_6.part, body_7.part, body_8.part, body_9.part])
